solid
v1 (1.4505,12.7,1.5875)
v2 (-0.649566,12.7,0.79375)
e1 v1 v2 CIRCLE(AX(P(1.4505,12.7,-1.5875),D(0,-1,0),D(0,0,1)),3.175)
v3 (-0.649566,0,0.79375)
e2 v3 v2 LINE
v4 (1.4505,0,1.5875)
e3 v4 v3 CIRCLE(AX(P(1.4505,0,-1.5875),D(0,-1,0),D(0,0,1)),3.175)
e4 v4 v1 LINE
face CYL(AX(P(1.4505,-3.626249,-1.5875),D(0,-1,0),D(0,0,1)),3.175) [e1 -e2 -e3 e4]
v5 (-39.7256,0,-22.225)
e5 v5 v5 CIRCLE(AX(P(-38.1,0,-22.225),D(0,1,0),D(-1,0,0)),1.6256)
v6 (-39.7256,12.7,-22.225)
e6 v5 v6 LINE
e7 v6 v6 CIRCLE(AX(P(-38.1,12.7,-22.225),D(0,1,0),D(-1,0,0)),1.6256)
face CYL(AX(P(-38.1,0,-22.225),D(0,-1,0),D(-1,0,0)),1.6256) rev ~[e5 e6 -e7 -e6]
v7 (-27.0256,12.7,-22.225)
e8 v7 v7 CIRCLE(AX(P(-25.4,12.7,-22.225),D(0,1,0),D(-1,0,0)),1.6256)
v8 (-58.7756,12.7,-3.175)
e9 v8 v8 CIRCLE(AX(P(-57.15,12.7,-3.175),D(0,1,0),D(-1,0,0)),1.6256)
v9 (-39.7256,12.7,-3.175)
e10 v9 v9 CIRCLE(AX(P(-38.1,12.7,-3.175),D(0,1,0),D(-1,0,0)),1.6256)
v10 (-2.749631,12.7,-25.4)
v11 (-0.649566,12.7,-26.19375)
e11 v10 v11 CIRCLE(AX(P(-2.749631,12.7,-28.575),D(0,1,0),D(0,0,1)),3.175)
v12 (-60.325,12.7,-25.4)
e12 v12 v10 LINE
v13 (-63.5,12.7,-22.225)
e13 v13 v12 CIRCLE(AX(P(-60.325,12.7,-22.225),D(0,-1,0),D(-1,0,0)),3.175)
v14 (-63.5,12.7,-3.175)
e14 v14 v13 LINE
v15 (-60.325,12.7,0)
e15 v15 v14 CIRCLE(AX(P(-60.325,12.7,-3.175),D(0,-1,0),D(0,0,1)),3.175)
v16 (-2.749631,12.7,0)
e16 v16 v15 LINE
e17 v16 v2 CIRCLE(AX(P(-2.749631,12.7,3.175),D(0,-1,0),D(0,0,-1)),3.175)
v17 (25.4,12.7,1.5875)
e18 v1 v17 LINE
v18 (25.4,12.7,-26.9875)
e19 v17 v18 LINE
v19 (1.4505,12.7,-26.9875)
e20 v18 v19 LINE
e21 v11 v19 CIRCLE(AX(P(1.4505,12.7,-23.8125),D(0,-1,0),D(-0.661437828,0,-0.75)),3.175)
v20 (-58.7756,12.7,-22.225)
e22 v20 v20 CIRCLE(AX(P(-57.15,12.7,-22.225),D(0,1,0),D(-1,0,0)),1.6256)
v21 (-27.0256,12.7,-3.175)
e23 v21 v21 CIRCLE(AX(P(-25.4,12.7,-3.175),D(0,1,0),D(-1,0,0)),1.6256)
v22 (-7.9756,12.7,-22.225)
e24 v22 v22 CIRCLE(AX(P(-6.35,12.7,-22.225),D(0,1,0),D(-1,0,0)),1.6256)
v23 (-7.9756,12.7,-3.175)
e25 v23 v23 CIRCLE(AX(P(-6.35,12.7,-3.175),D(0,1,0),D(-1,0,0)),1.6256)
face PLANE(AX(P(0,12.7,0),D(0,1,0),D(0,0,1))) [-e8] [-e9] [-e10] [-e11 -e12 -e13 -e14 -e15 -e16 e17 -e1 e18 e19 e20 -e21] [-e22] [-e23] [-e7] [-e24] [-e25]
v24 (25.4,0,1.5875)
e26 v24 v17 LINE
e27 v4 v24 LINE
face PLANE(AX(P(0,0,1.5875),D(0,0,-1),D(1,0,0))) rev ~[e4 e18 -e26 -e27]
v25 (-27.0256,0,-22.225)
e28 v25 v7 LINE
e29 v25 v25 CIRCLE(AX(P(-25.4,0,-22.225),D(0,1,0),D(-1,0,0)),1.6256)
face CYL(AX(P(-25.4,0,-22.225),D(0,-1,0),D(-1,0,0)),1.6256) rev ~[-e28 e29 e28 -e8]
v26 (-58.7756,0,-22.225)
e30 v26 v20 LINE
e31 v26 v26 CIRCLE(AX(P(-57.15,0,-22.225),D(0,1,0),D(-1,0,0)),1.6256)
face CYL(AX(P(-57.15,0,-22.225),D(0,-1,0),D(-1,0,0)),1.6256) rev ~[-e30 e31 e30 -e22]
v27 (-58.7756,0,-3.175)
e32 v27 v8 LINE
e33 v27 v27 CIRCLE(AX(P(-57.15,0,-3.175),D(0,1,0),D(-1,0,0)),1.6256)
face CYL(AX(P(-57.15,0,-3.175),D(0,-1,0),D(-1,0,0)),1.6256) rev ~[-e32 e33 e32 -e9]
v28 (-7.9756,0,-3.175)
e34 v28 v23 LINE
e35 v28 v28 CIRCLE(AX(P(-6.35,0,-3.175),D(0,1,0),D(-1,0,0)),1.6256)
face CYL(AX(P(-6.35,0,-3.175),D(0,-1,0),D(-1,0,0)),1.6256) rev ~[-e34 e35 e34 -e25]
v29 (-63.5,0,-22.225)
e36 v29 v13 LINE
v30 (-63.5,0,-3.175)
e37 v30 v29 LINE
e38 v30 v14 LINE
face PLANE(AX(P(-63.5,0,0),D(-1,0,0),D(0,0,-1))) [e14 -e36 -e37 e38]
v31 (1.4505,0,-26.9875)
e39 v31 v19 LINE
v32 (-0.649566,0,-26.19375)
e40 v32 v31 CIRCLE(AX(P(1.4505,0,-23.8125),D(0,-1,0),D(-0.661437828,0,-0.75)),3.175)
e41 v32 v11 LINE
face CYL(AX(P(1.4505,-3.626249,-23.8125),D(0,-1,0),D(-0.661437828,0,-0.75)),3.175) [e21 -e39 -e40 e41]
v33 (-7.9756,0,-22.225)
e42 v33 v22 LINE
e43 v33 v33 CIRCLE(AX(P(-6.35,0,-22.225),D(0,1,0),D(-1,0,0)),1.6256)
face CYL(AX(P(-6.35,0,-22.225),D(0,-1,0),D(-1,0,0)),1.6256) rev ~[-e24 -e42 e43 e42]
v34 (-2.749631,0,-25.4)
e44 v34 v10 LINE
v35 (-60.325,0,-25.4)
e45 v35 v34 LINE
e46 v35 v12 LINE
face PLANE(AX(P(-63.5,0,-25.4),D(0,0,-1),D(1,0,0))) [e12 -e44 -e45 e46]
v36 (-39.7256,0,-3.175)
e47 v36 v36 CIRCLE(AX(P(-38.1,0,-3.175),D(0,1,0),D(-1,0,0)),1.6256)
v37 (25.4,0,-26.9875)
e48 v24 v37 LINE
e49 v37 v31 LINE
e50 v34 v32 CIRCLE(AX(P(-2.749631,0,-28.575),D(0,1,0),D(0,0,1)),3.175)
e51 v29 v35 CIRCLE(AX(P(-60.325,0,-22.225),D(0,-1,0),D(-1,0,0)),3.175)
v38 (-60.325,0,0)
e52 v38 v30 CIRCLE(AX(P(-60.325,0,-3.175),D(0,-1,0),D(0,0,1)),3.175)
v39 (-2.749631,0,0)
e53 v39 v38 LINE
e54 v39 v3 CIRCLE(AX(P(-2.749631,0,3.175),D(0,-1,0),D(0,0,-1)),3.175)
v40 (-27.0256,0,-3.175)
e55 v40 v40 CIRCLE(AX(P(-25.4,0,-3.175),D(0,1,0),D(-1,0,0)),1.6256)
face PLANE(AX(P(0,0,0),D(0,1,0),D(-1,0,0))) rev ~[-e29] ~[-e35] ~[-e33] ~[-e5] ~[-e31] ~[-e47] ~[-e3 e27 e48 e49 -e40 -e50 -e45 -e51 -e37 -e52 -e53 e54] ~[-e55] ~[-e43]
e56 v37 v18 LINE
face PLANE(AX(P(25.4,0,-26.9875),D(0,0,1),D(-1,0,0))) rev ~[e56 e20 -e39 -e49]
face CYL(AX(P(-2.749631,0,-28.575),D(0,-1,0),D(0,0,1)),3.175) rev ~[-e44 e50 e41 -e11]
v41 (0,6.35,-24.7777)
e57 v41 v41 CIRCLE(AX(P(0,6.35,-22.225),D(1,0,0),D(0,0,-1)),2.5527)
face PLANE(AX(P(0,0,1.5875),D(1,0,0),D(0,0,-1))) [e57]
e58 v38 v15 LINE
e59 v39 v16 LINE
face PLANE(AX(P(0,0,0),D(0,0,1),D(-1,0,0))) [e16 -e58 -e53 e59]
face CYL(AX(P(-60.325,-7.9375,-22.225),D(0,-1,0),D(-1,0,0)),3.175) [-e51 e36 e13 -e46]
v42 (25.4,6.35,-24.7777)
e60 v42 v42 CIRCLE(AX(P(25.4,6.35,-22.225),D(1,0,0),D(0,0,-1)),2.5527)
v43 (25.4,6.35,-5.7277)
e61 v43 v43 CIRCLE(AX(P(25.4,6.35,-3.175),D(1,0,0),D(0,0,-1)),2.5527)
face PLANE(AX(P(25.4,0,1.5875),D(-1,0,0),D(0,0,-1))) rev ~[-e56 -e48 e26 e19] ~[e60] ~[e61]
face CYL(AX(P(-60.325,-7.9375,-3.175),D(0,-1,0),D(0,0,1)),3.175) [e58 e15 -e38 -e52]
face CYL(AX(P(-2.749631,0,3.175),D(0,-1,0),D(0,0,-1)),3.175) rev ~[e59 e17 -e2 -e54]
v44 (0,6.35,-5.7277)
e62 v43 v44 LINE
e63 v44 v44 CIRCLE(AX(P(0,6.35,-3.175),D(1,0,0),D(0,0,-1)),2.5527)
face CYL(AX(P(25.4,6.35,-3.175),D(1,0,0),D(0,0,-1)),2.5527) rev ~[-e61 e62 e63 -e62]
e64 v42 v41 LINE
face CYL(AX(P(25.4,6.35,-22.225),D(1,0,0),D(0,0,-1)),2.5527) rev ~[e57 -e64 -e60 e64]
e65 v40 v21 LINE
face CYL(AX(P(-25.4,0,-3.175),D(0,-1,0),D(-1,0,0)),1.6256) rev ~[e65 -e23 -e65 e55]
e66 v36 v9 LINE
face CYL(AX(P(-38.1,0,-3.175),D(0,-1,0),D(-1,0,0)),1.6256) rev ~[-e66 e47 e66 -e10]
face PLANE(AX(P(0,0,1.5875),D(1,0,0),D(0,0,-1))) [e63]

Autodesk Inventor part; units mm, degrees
ref_plane "YZ Plane" through (0, 0, 0) normal (1, 0, 0) x (0, 1, 0)
ref_plane "XZ Plane" through (0, 0, 0) normal (0, 1, 0) x (-1, 0, 0)
ref_plane "XY Plane" through (0, 0, 0) normal (0, 0, 1) x (1, 0, 0)
sketch "Sketch1" plane through (0, 0, 0) normal (0, 1, 0) x (-1, 0, 0)
  line L0 (0, 0) -> (63.5, 0)
  line L1 (63.5, 0) -> (63.5, -25.4)
  line L2 (63.5, -25.4) -> (0, -25.4)
  line L3 (0, -25.4) -> (0, 0) construction
  line L4 (0, 1.5875) -> (-25.4, 1.5875)
  line L5 (-25.4, 1.5875) -> (-25.4, -26.9875)
  line L6 (-25.4, -26.9875) -> (0, -26.9875)
  line L7 (0, -26.9875) -> (0, 1.5875)
  circle A0 centre (6.35, -3.175) radius 1.6256
  circle A1 centre (25.4, -3.175) radius 1.6256
  circle A2 centre (6.35, -22.225) radius 1.6256
  circle A3 centre (25.4, -22.225) radius 1.6256
  circle A4 centre (57.15, -3.175) radius 1.6256
  circle A5 centre (57.15, -22.225) radius 1.6256
  circle A6 centre (38.1, -3.175) radius 1.6256
  circle A7 centre (38.1, -22.225) radius 1.6256
  point P0 (0, -12.7)
  point P1 (0, -12.7)
  point P2 (-12.7, 1.5875)
  point P3 (-12.7, -26.9875)
  point P4 (0, -25.4)
  dimension "d0" = 25.4
  dimension "d11" = 63.5
  dimension "d12" = 25.4
  dimension "d20" = 3.2512
  dimension "d23" = 19.05
  dimension "d26" = 19.05
  dimension "d29" = 3.2512
  dimension "d32" = 19.05
  dimension "d35" = 19.05
  dimension "d38" = 12.7
  dimension "d39" = 6.35
  dimension "d40" = 3.175
  dimension "d41" = 28.575
extrude "Extrusion1" add sketch "Sketch1" along normal blind 12.7
fillet "Fillet1" radius 3.175 6 edges at (-63.5, 6.35, -25.4) (-63.5, 6.35, 0) (0, 6.35, -25.4) (0, 6.35, -26.9875) (0, 6.35, 0) (0, 6.35, 1.5875)
sketch "Sketch2" plane through (25.4, 0, 1.5875) normal (1, 0, 0) x (0, 0, -1)
  line L0 (0, 12.7) -> (28.575, 12.7)
  line L1 (28.575, 12.7) -> (28.575, 0)
  line L2 (28.575, 0) -> (0, 0)
  line L3 (0, 0) -> (0, 12.7)
  line L4 (0, 12.7) -> (28.575, 0) construction
  line L5 (28.575, 12.7) -> (0, 0) construction
  line L6 (0, 12.7) -> (28.575, 12.7) projected
  line L7 (0, 0) -> (0, 12.7) projected
  circle A0 centre (23.8125, 6.35) radius 2.5527
  circle A1 centre (4.7625, 6.35) radius 2.5527
  point P0 (1.5875, 0)
  point P1 (14.2875, 6.35)
  dimension "d45" = 5.1054
  dimension "d46" = 9.525
  dimension "d47" = 9.525
extrude "Extrusion2" cut sketch "Sketch2" against normal blind 25.4 contours A0 | A1
thread "Thread1" size "1/4-20 UNC" class "2B" standard "ANSI Unified Screw Threads" full length
thread "Thread2" size "1/4-20 UNC" class "2B" standard "ANSI Unified Screw Threads" full length
properties part number "DVBS_009_RemoteLookingBracket" material "Polyethylene, High Density"
